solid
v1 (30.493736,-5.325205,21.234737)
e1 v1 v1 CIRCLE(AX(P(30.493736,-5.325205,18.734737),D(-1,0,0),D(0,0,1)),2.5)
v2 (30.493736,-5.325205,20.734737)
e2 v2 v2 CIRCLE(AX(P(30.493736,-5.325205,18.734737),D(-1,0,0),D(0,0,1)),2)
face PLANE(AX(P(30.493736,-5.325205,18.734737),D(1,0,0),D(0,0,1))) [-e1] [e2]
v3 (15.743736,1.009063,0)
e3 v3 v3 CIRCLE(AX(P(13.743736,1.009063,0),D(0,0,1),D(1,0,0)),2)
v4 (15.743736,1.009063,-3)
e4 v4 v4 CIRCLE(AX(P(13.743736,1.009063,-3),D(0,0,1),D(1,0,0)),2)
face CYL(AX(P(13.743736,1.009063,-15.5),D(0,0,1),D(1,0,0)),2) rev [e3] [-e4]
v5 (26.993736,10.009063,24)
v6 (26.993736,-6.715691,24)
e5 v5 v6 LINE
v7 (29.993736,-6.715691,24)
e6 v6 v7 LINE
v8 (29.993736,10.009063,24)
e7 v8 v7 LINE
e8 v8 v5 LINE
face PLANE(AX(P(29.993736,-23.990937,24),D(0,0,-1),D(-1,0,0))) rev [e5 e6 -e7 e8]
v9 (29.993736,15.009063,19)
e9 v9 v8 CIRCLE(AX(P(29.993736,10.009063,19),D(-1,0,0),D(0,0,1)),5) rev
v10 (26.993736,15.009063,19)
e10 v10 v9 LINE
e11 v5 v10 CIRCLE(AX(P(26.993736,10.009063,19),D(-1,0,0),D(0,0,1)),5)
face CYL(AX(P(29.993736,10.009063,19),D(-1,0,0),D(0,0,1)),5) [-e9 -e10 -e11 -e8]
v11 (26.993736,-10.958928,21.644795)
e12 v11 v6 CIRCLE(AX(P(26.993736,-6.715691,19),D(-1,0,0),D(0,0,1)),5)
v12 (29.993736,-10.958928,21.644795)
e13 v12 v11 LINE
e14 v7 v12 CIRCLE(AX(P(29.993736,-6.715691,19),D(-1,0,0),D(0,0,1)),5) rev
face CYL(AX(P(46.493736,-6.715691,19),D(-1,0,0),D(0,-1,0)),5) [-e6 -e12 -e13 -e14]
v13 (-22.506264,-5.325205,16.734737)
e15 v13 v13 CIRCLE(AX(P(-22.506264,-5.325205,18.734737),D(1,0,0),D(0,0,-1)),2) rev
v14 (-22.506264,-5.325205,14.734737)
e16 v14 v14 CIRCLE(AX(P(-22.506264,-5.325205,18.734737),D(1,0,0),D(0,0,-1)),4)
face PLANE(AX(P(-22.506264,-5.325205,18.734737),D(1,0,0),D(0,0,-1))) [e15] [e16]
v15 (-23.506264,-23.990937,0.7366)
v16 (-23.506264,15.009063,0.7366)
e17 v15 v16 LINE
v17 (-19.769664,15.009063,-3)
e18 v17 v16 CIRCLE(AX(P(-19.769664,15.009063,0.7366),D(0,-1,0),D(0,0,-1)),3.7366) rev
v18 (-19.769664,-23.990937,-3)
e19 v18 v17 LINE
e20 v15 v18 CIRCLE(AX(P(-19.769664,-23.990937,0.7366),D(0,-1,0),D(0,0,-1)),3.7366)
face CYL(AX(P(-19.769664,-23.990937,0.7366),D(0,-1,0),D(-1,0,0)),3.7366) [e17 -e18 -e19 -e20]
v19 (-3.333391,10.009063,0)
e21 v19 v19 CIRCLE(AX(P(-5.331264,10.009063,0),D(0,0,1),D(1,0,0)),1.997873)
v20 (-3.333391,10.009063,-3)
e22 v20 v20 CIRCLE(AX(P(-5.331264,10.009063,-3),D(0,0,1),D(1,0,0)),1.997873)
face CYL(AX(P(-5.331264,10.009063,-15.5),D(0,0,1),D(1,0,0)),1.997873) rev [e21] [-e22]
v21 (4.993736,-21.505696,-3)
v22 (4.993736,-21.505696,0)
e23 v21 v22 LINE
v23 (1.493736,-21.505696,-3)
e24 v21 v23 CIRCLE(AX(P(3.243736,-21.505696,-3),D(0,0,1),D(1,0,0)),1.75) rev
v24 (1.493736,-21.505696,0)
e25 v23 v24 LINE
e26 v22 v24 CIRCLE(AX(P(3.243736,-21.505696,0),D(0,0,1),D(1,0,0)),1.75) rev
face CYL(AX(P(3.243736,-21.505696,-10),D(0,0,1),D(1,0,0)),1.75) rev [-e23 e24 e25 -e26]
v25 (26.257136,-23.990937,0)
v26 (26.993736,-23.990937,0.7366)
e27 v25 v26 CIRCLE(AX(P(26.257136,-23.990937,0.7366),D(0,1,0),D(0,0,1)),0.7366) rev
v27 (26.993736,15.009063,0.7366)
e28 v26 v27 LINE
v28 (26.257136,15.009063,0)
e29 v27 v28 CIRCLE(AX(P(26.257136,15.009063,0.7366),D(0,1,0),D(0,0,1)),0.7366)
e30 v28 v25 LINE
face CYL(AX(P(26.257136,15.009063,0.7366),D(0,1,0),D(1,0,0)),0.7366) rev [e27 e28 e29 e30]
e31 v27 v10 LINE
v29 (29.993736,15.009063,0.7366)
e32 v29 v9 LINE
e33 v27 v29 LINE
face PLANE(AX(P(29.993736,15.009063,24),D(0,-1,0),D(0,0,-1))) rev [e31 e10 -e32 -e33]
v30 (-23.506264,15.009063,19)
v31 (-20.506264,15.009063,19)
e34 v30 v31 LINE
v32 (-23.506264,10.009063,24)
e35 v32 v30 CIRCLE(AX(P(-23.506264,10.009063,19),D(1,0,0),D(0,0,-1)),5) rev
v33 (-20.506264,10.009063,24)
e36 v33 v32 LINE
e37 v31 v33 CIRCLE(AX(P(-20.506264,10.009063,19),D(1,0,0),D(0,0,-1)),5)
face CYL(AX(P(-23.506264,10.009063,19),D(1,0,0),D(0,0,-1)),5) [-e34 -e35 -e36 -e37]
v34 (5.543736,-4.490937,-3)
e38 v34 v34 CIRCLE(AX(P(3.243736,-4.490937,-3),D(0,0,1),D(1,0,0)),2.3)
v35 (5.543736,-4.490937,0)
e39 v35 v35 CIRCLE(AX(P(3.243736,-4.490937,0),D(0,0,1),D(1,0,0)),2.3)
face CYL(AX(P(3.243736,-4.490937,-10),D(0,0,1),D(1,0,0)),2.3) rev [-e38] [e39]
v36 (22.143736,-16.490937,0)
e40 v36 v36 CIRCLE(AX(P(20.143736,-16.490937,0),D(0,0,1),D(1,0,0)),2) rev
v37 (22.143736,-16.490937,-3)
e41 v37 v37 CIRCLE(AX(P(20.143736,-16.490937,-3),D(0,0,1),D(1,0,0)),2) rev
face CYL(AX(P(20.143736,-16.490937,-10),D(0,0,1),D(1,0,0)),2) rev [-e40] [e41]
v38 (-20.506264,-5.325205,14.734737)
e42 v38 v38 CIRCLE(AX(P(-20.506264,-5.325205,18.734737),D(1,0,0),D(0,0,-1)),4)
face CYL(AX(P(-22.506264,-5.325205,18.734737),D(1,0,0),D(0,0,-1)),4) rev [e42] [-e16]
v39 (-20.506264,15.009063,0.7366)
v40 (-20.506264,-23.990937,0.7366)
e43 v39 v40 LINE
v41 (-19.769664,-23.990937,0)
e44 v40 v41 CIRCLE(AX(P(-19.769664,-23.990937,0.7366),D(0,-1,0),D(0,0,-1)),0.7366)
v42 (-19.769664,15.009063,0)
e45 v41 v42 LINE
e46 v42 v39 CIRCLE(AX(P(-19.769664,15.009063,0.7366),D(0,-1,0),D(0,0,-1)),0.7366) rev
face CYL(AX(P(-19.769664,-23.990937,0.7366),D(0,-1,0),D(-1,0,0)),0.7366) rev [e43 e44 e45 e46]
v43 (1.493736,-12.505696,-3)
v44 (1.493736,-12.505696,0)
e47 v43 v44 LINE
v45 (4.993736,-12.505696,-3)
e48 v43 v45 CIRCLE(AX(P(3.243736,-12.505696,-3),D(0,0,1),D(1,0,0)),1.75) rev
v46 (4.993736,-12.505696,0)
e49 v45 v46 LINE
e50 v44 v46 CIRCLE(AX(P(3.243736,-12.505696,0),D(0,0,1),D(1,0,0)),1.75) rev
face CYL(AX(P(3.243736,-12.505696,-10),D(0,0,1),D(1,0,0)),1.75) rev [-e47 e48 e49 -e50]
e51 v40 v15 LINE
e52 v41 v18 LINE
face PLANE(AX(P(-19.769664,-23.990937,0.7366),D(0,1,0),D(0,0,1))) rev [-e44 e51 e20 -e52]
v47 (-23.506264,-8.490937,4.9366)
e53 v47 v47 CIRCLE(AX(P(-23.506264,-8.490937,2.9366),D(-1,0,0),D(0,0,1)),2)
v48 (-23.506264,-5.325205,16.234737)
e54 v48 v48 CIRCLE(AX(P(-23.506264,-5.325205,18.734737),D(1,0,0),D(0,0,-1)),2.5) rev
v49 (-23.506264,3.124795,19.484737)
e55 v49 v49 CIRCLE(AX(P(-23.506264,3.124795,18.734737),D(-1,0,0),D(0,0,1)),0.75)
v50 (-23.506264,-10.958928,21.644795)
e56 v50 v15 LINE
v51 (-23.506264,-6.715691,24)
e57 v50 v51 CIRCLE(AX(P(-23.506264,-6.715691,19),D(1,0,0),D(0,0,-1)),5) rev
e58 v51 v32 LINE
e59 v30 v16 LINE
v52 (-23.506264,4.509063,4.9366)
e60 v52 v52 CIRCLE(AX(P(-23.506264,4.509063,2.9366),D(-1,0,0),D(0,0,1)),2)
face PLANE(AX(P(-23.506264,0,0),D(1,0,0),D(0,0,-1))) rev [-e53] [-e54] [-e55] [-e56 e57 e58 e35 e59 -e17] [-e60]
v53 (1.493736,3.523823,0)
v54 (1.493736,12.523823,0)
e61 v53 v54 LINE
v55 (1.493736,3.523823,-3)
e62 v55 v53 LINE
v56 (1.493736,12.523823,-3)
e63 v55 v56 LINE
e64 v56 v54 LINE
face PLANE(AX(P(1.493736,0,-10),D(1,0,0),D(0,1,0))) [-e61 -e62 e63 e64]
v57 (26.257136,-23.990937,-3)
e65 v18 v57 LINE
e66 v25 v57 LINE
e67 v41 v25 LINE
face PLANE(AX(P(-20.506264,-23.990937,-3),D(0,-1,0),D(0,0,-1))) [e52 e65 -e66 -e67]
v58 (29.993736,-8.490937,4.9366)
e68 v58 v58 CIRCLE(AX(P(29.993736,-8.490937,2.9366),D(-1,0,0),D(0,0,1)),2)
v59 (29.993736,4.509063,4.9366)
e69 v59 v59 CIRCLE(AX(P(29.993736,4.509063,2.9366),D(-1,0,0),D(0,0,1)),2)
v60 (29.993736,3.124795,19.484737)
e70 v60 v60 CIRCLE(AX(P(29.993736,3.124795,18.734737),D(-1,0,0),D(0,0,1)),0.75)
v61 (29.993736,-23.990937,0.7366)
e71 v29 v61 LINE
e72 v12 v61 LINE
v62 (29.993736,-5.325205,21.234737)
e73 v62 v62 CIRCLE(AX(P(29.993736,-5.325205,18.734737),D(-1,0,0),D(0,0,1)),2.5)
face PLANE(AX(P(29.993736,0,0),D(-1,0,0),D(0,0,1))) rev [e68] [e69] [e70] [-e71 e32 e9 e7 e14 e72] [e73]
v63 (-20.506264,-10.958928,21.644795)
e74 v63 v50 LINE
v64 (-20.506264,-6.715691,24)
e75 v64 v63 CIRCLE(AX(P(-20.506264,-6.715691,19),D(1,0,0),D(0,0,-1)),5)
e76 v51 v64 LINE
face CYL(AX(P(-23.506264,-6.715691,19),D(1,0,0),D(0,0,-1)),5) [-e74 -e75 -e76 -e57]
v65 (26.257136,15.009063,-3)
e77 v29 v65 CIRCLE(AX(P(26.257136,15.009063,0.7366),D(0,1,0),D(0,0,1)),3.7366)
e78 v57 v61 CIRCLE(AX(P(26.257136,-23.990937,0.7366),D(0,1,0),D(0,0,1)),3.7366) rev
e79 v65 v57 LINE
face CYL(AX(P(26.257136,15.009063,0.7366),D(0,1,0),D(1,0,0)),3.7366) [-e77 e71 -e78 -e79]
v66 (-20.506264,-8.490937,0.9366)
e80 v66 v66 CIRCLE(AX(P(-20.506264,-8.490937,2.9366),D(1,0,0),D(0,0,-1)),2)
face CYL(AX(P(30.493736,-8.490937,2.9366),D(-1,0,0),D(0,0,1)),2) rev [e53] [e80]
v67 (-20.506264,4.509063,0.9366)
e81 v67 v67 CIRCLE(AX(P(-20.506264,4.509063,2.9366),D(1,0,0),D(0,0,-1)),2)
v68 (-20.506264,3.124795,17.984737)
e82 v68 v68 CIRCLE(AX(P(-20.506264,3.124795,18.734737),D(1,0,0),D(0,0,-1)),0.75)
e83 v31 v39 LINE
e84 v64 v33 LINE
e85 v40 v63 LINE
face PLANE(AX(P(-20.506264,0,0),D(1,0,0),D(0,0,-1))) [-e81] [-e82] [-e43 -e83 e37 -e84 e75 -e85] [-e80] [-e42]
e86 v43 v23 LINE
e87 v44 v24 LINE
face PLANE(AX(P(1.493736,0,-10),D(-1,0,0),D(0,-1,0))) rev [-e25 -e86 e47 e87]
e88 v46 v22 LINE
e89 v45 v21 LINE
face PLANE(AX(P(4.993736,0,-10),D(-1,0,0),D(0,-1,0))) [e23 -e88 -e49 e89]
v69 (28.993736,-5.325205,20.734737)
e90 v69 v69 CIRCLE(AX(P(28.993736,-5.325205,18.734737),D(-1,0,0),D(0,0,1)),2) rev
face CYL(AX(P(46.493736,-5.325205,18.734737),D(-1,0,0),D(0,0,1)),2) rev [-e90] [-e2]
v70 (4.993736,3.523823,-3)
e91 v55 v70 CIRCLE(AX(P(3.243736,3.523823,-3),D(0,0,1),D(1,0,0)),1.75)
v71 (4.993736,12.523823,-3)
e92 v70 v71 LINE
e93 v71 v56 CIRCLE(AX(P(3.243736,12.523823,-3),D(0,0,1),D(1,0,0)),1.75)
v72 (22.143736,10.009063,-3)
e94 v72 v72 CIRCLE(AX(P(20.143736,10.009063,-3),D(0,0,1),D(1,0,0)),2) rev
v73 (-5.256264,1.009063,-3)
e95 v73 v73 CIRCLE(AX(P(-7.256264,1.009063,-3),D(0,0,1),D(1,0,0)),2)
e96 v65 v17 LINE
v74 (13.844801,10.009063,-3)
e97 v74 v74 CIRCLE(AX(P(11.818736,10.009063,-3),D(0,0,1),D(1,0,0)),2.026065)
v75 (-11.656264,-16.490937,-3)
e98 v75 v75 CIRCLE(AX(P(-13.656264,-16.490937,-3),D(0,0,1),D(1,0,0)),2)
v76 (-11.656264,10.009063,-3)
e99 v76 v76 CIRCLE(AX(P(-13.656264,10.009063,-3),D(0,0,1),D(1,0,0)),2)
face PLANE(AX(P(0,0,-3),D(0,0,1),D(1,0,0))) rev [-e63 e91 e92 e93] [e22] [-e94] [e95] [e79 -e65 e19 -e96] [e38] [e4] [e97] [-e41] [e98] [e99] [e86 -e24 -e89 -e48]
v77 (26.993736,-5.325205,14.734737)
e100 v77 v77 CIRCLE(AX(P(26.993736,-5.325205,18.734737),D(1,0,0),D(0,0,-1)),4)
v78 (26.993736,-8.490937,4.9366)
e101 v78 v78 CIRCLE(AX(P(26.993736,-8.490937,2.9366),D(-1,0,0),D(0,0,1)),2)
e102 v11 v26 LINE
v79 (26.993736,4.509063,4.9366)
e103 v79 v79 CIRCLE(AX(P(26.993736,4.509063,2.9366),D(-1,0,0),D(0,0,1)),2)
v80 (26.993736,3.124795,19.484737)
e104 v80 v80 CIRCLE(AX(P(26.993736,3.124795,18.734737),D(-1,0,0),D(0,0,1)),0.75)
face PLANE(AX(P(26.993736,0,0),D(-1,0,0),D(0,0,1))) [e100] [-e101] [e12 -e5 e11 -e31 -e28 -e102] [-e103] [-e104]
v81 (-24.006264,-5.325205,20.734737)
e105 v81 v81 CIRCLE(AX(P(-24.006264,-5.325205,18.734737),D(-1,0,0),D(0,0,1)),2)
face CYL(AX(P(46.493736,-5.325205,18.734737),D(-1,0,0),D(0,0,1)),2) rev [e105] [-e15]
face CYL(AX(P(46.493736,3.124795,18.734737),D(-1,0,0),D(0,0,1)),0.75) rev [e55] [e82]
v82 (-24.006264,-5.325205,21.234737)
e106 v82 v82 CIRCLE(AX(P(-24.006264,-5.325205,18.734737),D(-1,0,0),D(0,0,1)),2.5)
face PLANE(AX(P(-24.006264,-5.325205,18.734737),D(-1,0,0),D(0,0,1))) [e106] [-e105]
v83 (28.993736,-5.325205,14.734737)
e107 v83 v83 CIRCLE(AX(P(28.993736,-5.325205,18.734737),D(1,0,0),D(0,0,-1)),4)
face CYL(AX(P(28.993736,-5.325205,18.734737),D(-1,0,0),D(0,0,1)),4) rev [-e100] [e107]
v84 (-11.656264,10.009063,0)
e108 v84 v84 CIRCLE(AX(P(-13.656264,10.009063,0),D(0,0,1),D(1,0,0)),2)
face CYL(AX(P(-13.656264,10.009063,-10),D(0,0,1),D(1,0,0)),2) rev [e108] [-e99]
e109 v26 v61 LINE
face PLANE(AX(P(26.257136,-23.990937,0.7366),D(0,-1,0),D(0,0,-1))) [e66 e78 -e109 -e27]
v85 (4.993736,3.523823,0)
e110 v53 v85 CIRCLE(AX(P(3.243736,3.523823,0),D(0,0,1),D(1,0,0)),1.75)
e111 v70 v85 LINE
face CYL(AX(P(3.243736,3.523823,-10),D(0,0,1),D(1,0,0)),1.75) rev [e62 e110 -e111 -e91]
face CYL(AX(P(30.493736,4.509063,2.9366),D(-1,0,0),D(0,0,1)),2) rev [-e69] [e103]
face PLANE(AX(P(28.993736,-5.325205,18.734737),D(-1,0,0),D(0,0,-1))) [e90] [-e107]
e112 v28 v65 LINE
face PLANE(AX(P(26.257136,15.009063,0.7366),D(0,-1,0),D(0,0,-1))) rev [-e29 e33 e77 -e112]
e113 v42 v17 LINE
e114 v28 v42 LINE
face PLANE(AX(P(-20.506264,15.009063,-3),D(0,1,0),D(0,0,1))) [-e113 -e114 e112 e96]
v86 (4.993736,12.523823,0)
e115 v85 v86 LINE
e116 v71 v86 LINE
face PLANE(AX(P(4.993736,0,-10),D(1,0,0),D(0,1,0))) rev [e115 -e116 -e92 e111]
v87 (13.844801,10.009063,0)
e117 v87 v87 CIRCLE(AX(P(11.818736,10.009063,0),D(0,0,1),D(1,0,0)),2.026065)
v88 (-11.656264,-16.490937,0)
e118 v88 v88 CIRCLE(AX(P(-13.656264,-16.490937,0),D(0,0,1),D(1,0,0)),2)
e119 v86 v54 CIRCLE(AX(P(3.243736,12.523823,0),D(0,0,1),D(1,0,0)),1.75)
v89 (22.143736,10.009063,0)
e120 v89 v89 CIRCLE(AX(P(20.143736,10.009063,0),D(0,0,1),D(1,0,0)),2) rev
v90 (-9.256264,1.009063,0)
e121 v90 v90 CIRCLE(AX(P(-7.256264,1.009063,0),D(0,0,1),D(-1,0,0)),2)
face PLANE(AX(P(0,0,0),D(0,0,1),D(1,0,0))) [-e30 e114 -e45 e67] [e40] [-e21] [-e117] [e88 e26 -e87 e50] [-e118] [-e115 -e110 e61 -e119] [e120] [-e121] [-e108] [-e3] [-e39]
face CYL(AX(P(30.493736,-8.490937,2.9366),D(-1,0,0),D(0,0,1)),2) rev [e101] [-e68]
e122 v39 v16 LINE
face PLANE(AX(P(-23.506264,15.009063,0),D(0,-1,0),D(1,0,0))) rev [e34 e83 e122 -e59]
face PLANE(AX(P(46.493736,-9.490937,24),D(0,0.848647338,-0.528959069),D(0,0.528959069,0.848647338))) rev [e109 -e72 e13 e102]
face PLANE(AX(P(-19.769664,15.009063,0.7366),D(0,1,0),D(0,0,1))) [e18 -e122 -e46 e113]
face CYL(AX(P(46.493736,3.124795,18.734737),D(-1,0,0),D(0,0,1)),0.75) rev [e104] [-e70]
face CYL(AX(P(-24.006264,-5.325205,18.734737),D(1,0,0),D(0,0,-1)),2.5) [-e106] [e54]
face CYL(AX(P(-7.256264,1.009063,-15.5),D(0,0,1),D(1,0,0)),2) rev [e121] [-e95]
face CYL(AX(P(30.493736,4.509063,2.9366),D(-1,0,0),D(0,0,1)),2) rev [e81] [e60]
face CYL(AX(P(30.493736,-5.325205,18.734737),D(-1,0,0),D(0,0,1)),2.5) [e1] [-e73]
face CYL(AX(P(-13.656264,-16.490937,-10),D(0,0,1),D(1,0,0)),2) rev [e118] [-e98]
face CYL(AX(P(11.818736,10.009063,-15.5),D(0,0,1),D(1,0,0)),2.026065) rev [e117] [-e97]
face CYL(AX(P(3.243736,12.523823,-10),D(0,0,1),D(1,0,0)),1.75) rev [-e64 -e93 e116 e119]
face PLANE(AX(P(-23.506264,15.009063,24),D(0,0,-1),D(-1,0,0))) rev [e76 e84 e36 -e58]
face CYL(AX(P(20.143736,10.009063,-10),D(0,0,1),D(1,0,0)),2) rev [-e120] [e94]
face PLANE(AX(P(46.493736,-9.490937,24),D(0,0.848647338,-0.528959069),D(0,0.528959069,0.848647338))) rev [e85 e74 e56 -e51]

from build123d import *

# Parameters (mm, degrees)
ESBO_O1_W                        = 47.5
ESBO_O1_H                        = 39
FLANGE_BASE1_DEPTH               = 3
ESBO_O6_R                        = 2.3
CORTE_EXTRUS_O1_DEPTH            = 10
ARESTA_FLANGE1_STRIP_W           = 13.4732
ARESTA_FLANGE1_STRIP_H           = 3
ARESTA_FLANGE1_STRIP_CUT_DEPTH   = 39
ARESTA_FLANGE1_STRIP_2_W         = 13.4732
ARESTA_FLANGE1_STRIP_2_H         = 3
ARESTA_FLANGE1_STRIP_CUT_2_DEPTH = 39
ARESTA_FLANGE1_DEPTH             = 39
ARESTA_FLANGE1_BEND_DEPTH        = 39
ESBO_O13_R                       = 2
ESBO_O13_R_2                     = 0.75
CORTE_EXTRUS_O2_DEPTH            = 70
FILETE1_R                        = 5
ESBO_O14_R                       = 1.997873176
ESBO_O14_R_2                     = 2.026064888
ESBO_O14_R_3                     = 2
CORTE_EXTRUS_O4_DEPTH            = 15.5
BOSS_EXTRUDE1_START              = 0.5
SKETCH1_R                        = 2.5
SKETCH1_R_2                      = 2
BOSS_EXTRUDE1_DEPTH              = 0.5
SKETCH2_R                        = 4
CUT_EXTRUDE8_DEPTH               = 2
ESBO_O15_R                       = 2
CORTE_EXTRUS_O5_DEPTH            = 64.777464961


# Sheet-metal steps are written as plain solids
with BuildPart() as part:
    # Esboço1 → Flange-base1 (new body)
    with BuildSketch(Plane.XY):
        with Locations((3.243735783, -4.490936556)):
            Rectangle(ESBO_O1_W, ESBO_O1_H)
    extrude(amount=-FLANGE_BASE1_DEPTH)

    # Esboço6 → Corte-extrusão1 (cut)
    with BuildSketch(Plane.XY):
        with BuildLine():
            Line((-13.656264217, 8.009063444), (-13.656264217, 10.009063444))
            Line((-13.656264217, 10.009063444), (-11.656264217, 10.009063444))
            ThreePointArc((-11.656264217, 10.009063444), (-15.070477779, 11.423277006), (-13.656264217, 8.009063444))
        make_face()
        with BuildLine():
            Line((-11.656264217, 10.009063444), (-13.656264217, 10.009063444))
            Line((-13.656264217, 10.009063444), (-13.656264217, 8.009063444))
            ThreePointArc((-13.656264217, 8.009063444), (-12.242050654, 8.594849882), (-11.656264217, 10.009063444))
        make_face()
        with BuildLine():
            ThreePointArc((-11.656264217, -16.490936556), (-12.242050654, -15.076722994), (-13.656264217, -14.490936556))
            Line((-13.656264217, -14.490936556), (-13.656264217, -16.490936556))
            Line((-13.656264217, -16.490936556), (-11.656264217, -16.490936556))
        make_face()
        with BuildLine():
            Line((-13.656264217, -16.490936556), (-13.656264217, -14.490936556))
            ThreePointArc((-13.656264217, -14.490936556), (-15.070477779, -17.905150118), (-11.656264217, -16.490936556))
            Line((-11.656264217, -16.490936556), (-13.656264217, -16.490936556))
        make_face()
        with Locations((3.243735783, -4.490936556)):
            Circle(ESBO_O6_R)
        with BuildLine():
            Line((4.993735783, 10.009063444), (1.493735783, 10.009063444))
            Line((1.493735783, 10.009063444), (1.493735783, 3.523823043))
            ThreePointArc((1.493735783, 3.523823043), (3.243735783, 1.773823043), (4.993735783, 3.523823043))
            Line((4.993735783, 3.523823043), (4.993735783, 10.009063444))
        make_face()
        with BuildLine():
            Line((1.493735783, 12.523823043), (1.493735783, 10.009063444))
            Line((1.493735783, 10.009063444), (4.993735783, 10.009063444))
            Line((4.993735783, 10.009063444), (4.993735783, 12.523823043))
            ThreePointArc((4.993735783, 12.523823043), (3.243735783, 14.273823043), (1.493735783, 12.523823043))
        make_face()
        with BuildLine():
            Line((1.493735783, -12.505696155), (1.493735783, -16.490936556))
            Line((1.493735783, -16.490936556), (4.993735783, -16.490936556))
            Line((4.993735783, -16.490936556), (4.993735783, -12.505696155))
            ThreePointArc((4.993735783, -12.505696155), (3.243735783, -10.755696155), (1.493735783, -12.505696155))
        make_face()
        with BuildLine():
            Line((4.993735783, -16.490936556), (1.493735783, -16.490936556))
            Line((1.493735783, -16.490936556), (1.493735783, -21.505696155))
            ThreePointArc((1.493735783, -21.505696155), (3.243735783, -23.255696155), (4.993735783, -21.505696155))
            Line((4.993735783, -21.505696155), (4.993735783, -16.490936556))
        make_face()
        with BuildLine():
            ThreePointArc((22.143735783, -16.490936556), (21.557949346, -15.076722994), (20.143735783, -14.490936556))
            Line((20.143735783, -14.490936556), (20.143735783, -16.490936556))
            Line((20.143735783, -16.490936556), (18.143735783, -16.490936556))
            ThreePointArc((18.143735783, -16.490936556), (20.143735783, -18.490936556), (22.143735783, -16.490936556))
        make_face()
        with BuildLine():
            Line((20.143735783, -16.490936556), (20.143735783, -14.490936556))
            ThreePointArc((20.143735783, -14.490936556), (18.729522221, -15.076722994), (18.143735783, -16.490936556))
            Line((18.143735783, -16.490936556), (20.143735783, -16.490936556))
        make_face()
        with BuildLine():
            ThreePointArc((22.143735783, 10.009063444), (20.143735783, 12.009063444), (18.143735783, 10.009063444))
            Line((18.143735783, 10.009063444), (20.143735783, 10.009063444))
            Line((20.143735783, 10.009063444), (20.143735783, 8.009063444))
            ThreePointArc((20.143735783, 8.009063444), (21.557949346, 8.594849882), (22.143735783, 10.009063444))
        make_face()
        with BuildLine():
            Line((20.143735783, 10.009063444), (18.143735783, 10.009063444))
            ThreePointArc((18.143735783, 10.009063444), (18.729522221, 8.594849882), (20.143735783, 8.009063444))
            Line((20.143735783, 8.009063444), (20.143735783, 10.009063444))
        make_face()
    extrude(amount=-CORTE_EXTRUS_O1_DEPTH, mode=Mode.SUBTRACT)

    # Aresta-Flange1 strip (across the edge) → Aresta-Flange1 strip cut (cut)
    with BuildSketch(Plane(origin=(26.993735783, -23.990936556, 0), x_dir=(-1, 0, 0), z_dir=(0, 1, 0))):
        with Locations((-6, -1.5)):
            Rectangle(ARESTA_FLANGE1_STRIP_W, ARESTA_FLANGE1_STRIP_H)
    extrude(amount=ARESTA_FLANGE1_STRIP_CUT_DEPTH, mode=Mode.SUBTRACT)

    # Aresta-Flange1 strip 2 (across the edge) → Aresta-Flange1 strip cut 2 (cut)
    with BuildSketch(Plane(origin=(-20.506264217, 15.009063444, 0), x_dir=(1, 0, 0), z_dir=(0, -1, 0))):
        with Locations((-6, -1.5)):
            Rectangle(ARESTA_FLANGE1_STRIP_2_W, ARESTA_FLANGE1_STRIP_2_H)
    extrude(amount=ARESTA_FLANGE1_STRIP_CUT_2_DEPTH, mode=Mode.SUBTRACT)

    # Aresta-Flange1 section (across the edge) → Aresta-Flange1 (add)
    with BuildSketch(Plane(origin=(26.993735783, -23.990936556, 0), x_dir=(-1, 0, 0), z_dir=(0, 1, 0))):
        with BuildLine():
            Line((-3, 0.7366), (-3, 24))
            Line((-3, 24), (0, 24))
            Line((0, 24), (0, 0.7366))
            ThreePointArc((0, 0.7366), (0.215745145, 0.215745145), (0.7366, 0))
            Line((0.7366, 0), (0.7366, -3))
            ThreePointArc((0.7366, -3), (-1.905575199, -1.905575199), (-3, 0.7366))
        make_face()
    extrude(amount=ARESTA_FLANGE1_DEPTH)

    # Aresta-Flange1 section 2 (across the edge) → Aresta-Flange1 bend (add)
    with BuildSketch(Plane(origin=(-20.506264217, 15.009063444, 0), x_dir=(1, 0, 0), z_dir=(0, -1, 0))):
        with BuildLine():
            Line((-3, 0.7366), (-3, 24))
            Line((-3, 24), (0, 24))
            Line((0, 24), (0, 0.7366))
            ThreePointArc((0, 0.7366), (0.215745145, 0.215745145), (0.7366, 0))
            Line((0.7366, 0), (0.7366, -3))
            ThreePointArc((0.7366, -3), (-1.905575199, -1.905575199), (-3, 0.7366))
        make_face()
    extrude(amount=ARESTA_FLANGE1_BEND_DEPTH)

    # Esboço13 → Corte-extrusão2 (cut)
    with BuildSketch(Plane.ZY.offset(23.506264217)):
        with Locations((18.734737, -5.325205188)):
            Circle(ESBO_O13_R)
        with Locations((18.734737, 3.124794812)):
            Circle(ESBO_O13_R_2)
        Polygon((0.7366, -23.990936556), (24, -23.990936556), (24, -9.490936556), align=None)
    extrude(amount=-CORTE_EXTRUS_O2_DEPTH, mode=Mode.SUBTRACT)

    # Filete1
    filete1_edges = [part.edges().sort_by_distance(p)[0] for p in [
        (28.493735783, 15.009063444, 24),
        (-22.006264217, 15.009063444, 24),
        (-22.006264217, -9.490936556, 24),
        (28.493735783, -9.490936556, 24),
    ]]
    fillet(filete1_edges, radius=FILETE1_R)

    # Esboço14 → Corte-extrusão4 (cut)
    with BuildSketch(Plane.XY):
        with Locations((-5.331264217, 10.009063444)):
            Circle(ESBO_O14_R)
        with Locations((11.818735783, 10.009063444)):
            Circle(ESBO_O14_R_2)
        with Locations((13.743735783, 1.009063444)):
            Circle(ESBO_O14_R_3)
        with Locations((-7.256264217, 1.009063444)):
            Circle(ESBO_O14_R_3)
    extrude(amount=-CORTE_EXTRUS_O4_DEPTH, mode=Mode.SUBTRACT)

    # Sketch1 → Boss-Extrude1 (add)
    with BuildSketch(Plane.ZY.offset(23.506264217).offset(BOSS_EXTRUDE1_START)):
        with Locations(Location((18.734737, -5.325205188, 0), (0, 0, 180))):
            Circle(SKETCH1_R)
        with Locations((18.734737, -5.325205188)):
            Circle(SKETCH1_R_2, mode=Mode.SUBTRACT)
    boss_extrude1 = extrude(amount=-BOSS_EXTRUDE1_DEPTH)

    # Sketch2 → Cut-Extrude8 (cut)
    with BuildSketch(Plane(origin=(-20.506264217, 0, 0), x_dir=(0, 0, -1), z_dir=(1, 0, 0))):
        with Locations((-18.734737, -5.325205188)):
            Circle(SKETCH2_R)
    cut_extrude8 = extrude(amount=-CUT_EXTRUDE8_DEPTH, mode=Mode.SUBTRACT)

    # Mirror1: Boss-Extrude1, Cut-Extrude8 across plane
    add(boss_extrude1.mirror(Plane.ZY.offset(-3.243735783)))
    add(cut_extrude8.mirror(Plane.ZY.offset(-3.243735783)), mode=Mode.SUBTRACT)

    # Esboço15 → Corte-extrusão5 (cut, through all)
    with BuildSketch(Plane.ZY.offset(23.506264217)):
        with Locations((2.9366, 4.509063444)):
            Circle(ESBO_O15_R)
        with Locations((2.9366, -8.490936556)):
            Circle(ESBO_O15_R)
    extrude(amount=-CORTE_EXTRUS_O5_DEPTH, mode=Mode.SUBTRACT)


solid = part.part
